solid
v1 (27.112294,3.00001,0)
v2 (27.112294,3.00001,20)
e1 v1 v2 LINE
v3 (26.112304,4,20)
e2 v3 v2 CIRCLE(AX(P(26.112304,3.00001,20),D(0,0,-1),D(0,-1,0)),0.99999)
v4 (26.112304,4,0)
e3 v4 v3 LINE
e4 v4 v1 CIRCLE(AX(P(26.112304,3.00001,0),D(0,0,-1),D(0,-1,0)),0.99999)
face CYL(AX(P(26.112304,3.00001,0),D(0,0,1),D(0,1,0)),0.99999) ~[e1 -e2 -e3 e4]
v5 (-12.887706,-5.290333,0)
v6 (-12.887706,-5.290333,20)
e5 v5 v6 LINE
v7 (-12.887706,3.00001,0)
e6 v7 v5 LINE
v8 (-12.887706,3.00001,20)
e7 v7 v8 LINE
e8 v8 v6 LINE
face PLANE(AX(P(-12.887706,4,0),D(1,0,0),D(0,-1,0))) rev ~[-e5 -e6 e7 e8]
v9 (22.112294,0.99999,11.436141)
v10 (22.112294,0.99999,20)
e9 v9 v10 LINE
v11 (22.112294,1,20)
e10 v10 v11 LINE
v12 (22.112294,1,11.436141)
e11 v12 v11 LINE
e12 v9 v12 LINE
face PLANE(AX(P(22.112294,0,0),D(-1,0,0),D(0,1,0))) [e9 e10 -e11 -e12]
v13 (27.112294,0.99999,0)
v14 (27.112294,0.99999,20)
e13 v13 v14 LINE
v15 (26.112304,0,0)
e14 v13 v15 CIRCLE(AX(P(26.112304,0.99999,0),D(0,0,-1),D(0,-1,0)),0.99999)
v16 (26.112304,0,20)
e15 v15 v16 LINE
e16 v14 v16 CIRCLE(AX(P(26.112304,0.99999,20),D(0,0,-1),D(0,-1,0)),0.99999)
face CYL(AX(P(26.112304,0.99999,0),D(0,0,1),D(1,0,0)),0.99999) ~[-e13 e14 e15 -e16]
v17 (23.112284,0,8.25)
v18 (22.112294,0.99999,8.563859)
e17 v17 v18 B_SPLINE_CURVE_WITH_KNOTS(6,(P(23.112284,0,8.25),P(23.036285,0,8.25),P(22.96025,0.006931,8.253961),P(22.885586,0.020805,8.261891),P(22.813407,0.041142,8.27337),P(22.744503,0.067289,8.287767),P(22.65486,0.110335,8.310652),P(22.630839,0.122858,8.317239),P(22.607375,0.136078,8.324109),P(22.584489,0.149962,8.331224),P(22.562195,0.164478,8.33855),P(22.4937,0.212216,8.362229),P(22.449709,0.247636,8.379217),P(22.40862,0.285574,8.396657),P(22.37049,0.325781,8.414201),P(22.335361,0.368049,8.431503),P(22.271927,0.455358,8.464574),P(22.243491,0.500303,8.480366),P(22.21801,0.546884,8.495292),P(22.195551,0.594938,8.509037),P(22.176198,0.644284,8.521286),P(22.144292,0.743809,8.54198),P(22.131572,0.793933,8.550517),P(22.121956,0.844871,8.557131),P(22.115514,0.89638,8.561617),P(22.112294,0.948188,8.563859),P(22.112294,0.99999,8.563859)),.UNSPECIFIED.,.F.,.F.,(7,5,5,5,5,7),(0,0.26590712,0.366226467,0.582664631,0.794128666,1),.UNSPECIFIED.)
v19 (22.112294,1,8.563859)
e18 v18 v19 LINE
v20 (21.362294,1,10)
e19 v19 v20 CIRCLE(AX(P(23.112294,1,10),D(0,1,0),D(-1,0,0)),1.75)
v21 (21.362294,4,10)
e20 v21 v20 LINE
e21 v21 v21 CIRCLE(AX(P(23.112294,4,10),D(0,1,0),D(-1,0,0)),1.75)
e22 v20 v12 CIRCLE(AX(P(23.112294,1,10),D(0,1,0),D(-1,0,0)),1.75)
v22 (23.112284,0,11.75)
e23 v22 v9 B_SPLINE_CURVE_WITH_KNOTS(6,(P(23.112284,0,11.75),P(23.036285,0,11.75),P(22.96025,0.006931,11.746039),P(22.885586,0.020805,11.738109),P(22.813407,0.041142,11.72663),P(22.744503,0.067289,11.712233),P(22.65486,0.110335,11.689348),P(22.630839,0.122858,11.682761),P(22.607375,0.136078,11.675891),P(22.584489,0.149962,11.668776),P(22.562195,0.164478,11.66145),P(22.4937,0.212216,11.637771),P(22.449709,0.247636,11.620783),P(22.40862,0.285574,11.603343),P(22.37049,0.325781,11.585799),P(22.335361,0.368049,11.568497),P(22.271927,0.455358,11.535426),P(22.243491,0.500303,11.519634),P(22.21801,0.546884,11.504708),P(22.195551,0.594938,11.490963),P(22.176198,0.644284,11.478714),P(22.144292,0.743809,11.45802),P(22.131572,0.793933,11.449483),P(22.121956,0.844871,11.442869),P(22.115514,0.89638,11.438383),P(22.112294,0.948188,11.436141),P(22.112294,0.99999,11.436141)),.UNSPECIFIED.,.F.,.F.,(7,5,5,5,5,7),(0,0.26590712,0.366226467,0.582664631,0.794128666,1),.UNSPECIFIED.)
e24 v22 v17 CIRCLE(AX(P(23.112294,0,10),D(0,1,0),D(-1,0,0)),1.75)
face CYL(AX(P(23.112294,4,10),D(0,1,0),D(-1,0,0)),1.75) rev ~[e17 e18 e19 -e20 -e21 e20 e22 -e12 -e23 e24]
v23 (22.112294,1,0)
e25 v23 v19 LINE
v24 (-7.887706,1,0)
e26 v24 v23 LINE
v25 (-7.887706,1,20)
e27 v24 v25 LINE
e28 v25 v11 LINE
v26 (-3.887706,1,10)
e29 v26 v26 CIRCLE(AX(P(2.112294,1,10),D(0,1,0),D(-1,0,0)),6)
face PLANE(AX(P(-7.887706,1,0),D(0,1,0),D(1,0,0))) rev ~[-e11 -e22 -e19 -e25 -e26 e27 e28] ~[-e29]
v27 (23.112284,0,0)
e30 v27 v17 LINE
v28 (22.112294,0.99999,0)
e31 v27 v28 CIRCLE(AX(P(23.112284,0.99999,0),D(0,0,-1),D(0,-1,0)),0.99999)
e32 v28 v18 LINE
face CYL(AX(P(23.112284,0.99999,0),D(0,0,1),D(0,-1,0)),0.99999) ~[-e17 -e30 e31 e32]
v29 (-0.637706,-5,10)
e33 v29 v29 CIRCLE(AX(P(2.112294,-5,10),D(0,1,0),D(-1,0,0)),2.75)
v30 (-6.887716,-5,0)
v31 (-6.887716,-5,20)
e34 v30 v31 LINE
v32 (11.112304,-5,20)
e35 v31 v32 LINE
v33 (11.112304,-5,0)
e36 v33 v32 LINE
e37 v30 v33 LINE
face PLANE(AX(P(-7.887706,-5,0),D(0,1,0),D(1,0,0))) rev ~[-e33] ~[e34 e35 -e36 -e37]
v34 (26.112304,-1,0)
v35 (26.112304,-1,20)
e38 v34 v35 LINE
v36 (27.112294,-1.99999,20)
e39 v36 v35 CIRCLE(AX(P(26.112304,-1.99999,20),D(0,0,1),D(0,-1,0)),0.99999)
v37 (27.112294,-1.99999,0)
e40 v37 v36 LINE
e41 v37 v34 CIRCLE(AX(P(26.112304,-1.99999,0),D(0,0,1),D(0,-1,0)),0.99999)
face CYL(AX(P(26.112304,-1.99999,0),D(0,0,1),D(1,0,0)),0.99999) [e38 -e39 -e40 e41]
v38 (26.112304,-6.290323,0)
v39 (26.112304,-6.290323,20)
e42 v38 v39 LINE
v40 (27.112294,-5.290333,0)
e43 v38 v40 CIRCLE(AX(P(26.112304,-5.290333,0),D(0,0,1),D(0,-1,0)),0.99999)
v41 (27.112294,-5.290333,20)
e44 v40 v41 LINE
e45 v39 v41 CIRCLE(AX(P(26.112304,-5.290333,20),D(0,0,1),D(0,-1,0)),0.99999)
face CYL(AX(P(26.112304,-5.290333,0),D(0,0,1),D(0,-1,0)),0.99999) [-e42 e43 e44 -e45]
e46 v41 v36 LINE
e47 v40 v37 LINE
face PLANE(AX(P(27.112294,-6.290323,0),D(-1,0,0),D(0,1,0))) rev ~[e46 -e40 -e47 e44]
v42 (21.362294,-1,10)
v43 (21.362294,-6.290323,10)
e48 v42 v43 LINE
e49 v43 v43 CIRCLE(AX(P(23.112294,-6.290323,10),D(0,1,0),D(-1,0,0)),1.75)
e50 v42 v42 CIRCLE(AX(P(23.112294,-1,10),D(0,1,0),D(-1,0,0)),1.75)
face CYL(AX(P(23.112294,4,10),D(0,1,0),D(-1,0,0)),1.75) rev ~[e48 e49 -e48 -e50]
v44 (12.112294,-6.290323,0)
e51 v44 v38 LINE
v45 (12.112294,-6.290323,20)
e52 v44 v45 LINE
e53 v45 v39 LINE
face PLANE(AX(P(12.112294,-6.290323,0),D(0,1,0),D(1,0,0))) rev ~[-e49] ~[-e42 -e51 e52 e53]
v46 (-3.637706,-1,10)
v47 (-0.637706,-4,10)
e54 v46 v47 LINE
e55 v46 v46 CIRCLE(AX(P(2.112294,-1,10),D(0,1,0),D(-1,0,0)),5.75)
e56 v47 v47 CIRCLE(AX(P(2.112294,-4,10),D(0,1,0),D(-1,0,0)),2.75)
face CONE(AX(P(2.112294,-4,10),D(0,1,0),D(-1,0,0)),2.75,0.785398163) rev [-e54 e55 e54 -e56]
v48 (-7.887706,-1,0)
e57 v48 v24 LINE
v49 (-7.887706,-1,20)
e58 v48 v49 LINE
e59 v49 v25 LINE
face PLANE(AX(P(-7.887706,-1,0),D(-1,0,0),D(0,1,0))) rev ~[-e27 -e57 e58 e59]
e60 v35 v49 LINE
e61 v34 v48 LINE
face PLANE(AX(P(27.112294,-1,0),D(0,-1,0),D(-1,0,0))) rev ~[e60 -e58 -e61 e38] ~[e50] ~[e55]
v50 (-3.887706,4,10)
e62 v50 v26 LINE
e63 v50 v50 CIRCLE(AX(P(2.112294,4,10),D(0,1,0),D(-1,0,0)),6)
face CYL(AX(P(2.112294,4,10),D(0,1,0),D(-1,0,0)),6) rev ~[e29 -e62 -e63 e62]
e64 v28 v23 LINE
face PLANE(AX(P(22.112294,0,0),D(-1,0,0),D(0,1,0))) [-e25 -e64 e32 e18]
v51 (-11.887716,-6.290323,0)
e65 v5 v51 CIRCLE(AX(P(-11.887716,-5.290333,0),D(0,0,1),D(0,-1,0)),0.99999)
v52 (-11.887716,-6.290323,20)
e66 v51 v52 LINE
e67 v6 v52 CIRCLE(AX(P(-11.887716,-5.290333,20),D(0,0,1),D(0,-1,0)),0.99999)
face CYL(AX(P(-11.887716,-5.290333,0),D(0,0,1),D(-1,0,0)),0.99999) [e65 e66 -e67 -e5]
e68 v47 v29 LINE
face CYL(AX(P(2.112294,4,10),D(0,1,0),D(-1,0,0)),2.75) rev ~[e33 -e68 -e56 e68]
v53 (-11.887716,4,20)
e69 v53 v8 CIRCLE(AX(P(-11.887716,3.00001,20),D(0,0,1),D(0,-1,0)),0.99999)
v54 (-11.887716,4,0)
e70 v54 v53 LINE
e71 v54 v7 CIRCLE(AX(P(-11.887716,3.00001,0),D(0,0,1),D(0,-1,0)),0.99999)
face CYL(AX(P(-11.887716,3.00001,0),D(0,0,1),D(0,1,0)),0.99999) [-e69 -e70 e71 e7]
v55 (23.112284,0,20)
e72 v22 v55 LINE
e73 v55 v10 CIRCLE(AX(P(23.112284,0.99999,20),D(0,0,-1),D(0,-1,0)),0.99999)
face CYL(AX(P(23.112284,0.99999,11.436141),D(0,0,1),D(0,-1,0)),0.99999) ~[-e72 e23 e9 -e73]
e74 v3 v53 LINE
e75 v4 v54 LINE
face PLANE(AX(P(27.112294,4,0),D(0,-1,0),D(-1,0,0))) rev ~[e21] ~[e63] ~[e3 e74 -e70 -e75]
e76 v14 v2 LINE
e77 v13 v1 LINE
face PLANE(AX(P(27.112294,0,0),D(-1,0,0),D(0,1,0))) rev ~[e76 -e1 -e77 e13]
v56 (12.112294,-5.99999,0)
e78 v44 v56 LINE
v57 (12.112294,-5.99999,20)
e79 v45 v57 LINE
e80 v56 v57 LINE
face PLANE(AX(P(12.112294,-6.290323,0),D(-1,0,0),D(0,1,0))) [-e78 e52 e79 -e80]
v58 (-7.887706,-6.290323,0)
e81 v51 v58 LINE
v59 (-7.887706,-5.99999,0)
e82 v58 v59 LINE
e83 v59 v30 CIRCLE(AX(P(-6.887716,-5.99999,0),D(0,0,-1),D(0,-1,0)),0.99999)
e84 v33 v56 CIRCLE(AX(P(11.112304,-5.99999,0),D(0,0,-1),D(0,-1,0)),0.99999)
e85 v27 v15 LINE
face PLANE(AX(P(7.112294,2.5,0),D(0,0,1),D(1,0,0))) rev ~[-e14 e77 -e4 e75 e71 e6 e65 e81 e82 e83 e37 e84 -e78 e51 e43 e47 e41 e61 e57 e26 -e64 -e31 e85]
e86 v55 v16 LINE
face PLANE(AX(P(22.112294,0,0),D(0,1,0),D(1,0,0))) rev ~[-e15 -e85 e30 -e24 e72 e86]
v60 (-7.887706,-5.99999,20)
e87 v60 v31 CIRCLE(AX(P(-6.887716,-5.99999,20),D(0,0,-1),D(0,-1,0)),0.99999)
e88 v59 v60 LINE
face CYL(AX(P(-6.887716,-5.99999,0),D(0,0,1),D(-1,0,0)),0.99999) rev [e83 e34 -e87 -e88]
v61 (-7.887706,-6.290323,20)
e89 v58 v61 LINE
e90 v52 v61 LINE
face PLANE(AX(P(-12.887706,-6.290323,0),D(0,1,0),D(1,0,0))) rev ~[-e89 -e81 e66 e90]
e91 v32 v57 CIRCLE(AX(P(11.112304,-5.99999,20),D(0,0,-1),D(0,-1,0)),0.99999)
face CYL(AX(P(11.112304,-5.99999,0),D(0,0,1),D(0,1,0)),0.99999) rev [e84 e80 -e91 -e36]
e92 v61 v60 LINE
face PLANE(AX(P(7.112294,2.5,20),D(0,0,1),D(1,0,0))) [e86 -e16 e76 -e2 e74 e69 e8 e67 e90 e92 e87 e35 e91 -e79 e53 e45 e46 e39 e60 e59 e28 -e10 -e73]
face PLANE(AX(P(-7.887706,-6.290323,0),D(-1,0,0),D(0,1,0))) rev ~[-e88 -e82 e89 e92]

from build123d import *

# Parameters (mm, degrees)
F0_W     = 5
F0_H     = 2
F0_H_2   = 1.2903230384
F0_W_2   = 15
F0_H_3   = 1
F1_DEPTH = 20
F2_R     = 2.75
F2_R_2   = 1.75
F3_DEPTH = 25
F4_R     = 0.99999
F5_R     = 6
F5_R_2   = 2.75
F6_DEPTH = 5
F7_SIZE  = 3


# Not quite as in the source:
# - a fillet or chamfer is up to 0.001 mm smaller than in the source, because OpenCascade refuses the exact size


with BuildPart() as f1:
    # F0 (on Top) → F1 (new body)
    with BuildSketch(Plane.XY):
        Polygon((27.1122940337, 4), (-12.8877059663, 4), (-12.8877059663, 1), (-7.8877059663, 1), (22.1122940337, 1), (27.1122940337, 1), align=None)
        with Locations((-10.3877059663, 0)):
            Rectangle(F0_W, F0_H)
        Polygon((-7.8877059663, -1), (-12.8877059663, -1), (-12.8877059663, -5), (-7.8877059663, -5), (12.1122940337, -5), (27.1122940337, -5), (27.1122940337, -1), align=None)
        with Locations((-10.3877059663, -5.6451615192)):
            Rectangle(F0_W, F0_H_2)
        with Locations((19.6122940337, -5.6451615192)):
            Rectangle(F0_W_2, F0_H_2)
        with Locations((24.6122940337, 0.5)):
            Rectangle(F0_W, F0_H_3)
    extrude(amount=F1_DEPTH)

    # F2 (on face) → F3 (cut)
    with BuildSketch(Plane(origin=(0, 4, 0), x_dir=(-1, 0, 0), z_dir=(0, 1, 0))):
        with Locations((-2.1122940337, 10)):
            Circle(F2_R)
        with Locations((-23.1122940337, 10)):
            Circle(F2_R_2)
    extrude(amount=-F3_DEPTH, mode=Mode.SUBTRACT)

    # F4 (radius 1 in the source; OpenCascade refuses exactly that, so slightly less here)
    f4_edges = [f1.edges().sort_by_distance(p)[0] for p in [
        (-7.887706, -5, 10),
        (12.112294, -5, 10),
        (-12.887706, -6.290323, 10),
        (27.112294, -6.290323, 10),
        (27.112294, -1, 10),
        (27.112294, 0, 10),
        (27.112294, 4, 10),
        (-12.887706, 4, 10),
        (22.112294, 0, 15.71807),
        (22.112294, 0, 4.28193),
    ]]
    fillet(f4_edges, radius=F4_R)

    # F5 (on face) → F6 (cut)
    with BuildSketch(Plane(origin=(0, 4, 0), x_dir=(-1, 0, 0), z_dir=(0, 1, 0))):
        with Locations((-2.1122940337, 10)):
            Circle(F5_R)
        with Locations((-2.1122940337, 10)):
            Circle(F5_R_2, mode=Mode.SUBTRACT)
    extrude(amount=-F6_DEPTH, mode=Mode.SUBTRACT)

    # F7
    f7_edges = [f1.edges().sort_by_distance(p)[0] for p in [
        (4.862294, -1, 10),
    ]]
    chamfer(f7_edges, length=F7_SIZE)


solid = f1.part
